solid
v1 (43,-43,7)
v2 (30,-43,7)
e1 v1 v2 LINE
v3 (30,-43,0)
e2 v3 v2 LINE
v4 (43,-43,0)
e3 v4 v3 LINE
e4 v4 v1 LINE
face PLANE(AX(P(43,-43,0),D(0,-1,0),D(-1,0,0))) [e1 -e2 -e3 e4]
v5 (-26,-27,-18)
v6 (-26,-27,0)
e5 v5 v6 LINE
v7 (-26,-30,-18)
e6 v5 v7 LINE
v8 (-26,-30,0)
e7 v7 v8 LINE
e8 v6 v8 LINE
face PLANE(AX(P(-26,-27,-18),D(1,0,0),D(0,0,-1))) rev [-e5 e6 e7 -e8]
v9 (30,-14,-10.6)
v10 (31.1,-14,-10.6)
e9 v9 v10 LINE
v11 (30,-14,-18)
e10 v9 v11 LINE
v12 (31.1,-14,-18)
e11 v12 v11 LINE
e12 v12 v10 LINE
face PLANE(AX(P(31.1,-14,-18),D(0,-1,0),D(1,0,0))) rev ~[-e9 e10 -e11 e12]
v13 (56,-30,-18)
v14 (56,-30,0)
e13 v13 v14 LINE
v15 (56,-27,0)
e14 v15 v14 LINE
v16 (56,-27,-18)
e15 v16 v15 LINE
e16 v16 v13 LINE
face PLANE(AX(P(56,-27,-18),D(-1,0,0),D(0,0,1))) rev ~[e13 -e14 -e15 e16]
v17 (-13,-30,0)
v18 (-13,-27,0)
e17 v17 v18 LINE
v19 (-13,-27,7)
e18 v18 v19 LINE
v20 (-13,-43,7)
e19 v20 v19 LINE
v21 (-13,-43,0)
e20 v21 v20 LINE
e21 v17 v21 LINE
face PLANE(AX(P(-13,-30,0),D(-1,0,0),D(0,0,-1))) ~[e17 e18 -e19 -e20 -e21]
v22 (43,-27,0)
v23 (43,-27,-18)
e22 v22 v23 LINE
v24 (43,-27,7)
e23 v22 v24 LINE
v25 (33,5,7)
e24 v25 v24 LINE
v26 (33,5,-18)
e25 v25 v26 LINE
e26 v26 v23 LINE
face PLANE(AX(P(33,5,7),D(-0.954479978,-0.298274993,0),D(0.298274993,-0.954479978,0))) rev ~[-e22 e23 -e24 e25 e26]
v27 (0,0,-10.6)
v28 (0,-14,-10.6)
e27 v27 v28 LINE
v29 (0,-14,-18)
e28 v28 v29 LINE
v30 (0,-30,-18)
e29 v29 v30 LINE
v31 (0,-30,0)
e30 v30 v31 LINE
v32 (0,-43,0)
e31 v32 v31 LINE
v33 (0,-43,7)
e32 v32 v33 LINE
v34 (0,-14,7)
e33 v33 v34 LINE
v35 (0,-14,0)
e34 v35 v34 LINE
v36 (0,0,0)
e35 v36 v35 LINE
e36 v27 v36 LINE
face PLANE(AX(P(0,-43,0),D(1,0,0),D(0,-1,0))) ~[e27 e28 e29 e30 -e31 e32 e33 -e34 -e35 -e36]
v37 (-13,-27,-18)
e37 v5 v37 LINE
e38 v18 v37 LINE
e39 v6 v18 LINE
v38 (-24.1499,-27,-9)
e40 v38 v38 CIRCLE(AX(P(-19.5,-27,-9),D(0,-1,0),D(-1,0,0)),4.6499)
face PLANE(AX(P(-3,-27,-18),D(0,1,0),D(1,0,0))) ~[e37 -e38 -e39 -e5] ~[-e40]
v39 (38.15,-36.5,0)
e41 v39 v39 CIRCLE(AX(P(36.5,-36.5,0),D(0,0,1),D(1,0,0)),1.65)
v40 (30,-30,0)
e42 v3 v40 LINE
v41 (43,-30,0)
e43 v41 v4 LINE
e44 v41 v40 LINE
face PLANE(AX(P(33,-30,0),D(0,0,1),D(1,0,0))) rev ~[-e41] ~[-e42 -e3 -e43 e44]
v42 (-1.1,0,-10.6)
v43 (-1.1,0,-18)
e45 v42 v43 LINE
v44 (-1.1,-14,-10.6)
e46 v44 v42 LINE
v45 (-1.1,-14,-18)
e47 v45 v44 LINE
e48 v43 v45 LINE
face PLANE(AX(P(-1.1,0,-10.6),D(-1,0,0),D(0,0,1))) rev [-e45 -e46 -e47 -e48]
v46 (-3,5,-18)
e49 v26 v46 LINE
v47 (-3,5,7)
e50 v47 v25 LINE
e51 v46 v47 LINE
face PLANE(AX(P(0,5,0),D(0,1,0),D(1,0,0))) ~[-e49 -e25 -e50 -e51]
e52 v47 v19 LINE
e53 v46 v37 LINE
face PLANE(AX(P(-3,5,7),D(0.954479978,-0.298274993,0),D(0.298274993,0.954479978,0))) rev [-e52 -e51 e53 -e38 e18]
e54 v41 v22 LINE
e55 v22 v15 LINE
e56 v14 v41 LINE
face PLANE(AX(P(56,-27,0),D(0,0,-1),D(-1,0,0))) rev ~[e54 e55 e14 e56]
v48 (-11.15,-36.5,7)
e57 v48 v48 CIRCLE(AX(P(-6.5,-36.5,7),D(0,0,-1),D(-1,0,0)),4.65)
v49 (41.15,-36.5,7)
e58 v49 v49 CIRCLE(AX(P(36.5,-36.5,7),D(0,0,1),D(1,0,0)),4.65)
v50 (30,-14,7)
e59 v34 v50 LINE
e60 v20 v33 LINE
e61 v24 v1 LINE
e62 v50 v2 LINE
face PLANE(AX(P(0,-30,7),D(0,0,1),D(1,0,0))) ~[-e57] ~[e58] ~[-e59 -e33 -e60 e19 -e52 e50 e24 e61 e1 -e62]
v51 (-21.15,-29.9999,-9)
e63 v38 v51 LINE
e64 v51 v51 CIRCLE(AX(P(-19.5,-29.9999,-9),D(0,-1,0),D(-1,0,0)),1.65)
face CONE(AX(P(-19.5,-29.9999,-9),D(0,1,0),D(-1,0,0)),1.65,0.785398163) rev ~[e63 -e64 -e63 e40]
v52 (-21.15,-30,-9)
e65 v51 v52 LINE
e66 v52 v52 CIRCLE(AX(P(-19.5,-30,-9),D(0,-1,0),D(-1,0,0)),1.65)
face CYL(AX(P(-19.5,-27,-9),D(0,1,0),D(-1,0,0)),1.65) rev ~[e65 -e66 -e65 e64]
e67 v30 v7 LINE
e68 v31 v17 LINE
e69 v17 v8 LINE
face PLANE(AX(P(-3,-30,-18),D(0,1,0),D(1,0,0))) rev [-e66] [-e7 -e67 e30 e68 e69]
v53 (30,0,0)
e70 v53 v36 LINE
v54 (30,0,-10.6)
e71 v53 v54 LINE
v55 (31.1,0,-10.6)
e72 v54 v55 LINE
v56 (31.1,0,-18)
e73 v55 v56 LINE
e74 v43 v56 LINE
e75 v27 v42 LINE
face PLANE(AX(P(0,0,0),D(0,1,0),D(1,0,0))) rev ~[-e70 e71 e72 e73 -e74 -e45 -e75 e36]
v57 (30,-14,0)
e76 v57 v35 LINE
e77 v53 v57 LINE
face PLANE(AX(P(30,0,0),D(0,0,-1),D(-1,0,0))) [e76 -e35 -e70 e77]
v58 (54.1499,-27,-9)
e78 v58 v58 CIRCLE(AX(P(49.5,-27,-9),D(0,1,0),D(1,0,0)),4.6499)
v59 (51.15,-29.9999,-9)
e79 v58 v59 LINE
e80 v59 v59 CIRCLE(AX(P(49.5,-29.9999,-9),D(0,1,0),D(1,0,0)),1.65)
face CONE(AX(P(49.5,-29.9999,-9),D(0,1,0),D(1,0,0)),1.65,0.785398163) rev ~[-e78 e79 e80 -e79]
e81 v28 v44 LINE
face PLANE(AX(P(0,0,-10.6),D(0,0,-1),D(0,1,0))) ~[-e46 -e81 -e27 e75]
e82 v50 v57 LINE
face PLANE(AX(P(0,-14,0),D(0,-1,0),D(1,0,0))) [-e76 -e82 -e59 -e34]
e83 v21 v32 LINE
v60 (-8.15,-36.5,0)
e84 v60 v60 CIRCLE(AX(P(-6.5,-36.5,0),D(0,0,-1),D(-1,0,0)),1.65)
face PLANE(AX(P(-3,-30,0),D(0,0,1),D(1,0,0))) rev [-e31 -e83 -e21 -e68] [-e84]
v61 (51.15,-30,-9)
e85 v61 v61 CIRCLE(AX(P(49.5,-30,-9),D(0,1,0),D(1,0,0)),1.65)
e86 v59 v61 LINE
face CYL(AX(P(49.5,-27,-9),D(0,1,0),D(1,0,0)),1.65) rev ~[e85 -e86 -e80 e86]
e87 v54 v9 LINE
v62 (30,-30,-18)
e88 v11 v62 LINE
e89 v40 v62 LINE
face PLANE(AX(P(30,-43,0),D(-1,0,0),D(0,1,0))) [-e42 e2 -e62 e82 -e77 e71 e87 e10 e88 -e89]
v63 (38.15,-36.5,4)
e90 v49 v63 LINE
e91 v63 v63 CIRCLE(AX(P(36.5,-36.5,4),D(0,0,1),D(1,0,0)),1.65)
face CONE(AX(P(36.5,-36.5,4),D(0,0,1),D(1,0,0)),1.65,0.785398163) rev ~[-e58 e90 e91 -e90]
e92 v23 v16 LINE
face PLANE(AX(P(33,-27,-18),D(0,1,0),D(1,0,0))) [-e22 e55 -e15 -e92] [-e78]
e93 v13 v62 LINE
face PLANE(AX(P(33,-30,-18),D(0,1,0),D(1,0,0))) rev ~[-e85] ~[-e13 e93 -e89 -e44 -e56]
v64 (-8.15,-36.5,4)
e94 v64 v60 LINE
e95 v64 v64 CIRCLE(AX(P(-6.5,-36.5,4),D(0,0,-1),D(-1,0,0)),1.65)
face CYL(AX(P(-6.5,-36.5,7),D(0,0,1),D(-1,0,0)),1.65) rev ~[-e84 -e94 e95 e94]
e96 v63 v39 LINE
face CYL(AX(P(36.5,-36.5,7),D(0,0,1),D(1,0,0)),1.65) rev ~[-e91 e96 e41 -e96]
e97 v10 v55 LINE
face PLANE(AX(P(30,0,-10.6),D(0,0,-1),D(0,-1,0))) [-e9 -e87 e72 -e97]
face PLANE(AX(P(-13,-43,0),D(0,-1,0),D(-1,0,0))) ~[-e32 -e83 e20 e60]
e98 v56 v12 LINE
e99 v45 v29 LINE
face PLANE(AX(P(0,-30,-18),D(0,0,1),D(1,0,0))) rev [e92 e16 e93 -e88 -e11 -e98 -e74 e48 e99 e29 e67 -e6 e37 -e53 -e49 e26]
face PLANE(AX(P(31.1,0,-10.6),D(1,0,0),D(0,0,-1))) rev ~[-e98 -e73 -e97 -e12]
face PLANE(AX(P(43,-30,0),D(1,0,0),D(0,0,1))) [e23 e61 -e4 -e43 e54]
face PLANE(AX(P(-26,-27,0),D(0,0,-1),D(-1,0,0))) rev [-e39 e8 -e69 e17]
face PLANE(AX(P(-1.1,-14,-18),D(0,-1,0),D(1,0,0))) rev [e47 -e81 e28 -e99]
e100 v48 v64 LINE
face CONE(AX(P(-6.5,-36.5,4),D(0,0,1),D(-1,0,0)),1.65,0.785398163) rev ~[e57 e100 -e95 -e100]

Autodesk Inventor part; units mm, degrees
ref_plane "YZ Plane" through (0, 0, 0) normal (1, 0, 0) x (0, 1, 0)
ref_plane "XZ Plane" through (0, 0, 0) normal (0, 1, 0) x (-1, 0, 0)
ref_plane "XY Plane" through (0, 0, 0) normal (0, 0, 1) x (1, 0, 0)
sketch "Sketch1" plane through (0, 0, 0) normal (0, 1, 0) x (-1, 0, 0)
  line L0 (0, 0) -> (-30, 0)
  line L1 (-30, 0) -> (-30, -10.6)
  line L2 (-30, -10.6) -> (0, -10.6)
  line L3 (0, -10.6) -> (0, 0)
  line L4 (0, -10.6) -> (1.1, -10.6)
  line L5 (1.1, -10.6) -> (1.1, -18)
  line L6 (1.1, -18) -> (0, -18)
  line L7 (0, -18) -> (0, -10.6)
  line L8 (-30, -10.6) -> (-31.1, -10.6)
  line L9 (-31.1, -10.6) -> (-31.1, -18)
  line L10 (-31.1, -18) -> (-30, -18)
  line L11 (-30, -18) -> (-30, -10.6)
  line L12 (0, -18) -> (-30, -18)
  dimension "d0" = 30
  dimension "d1" = 10.6
  dimension "d2" = 1.1
  dimension "d3" = 1.1
  dimension "d4" = 7.4
  dimension "d5" = 7.4
extrude "Extrusion1" add sketch "Sketch1" along normal blind 3
sketch "Sketch2" plane through (30, 0, 0) normal (1, 0, 0) x (0, 0, -1)
  point P0 (0, 0)
sketch "Sketch3" plane through (30, 0, 0) normal (1, 0, 0) x (0, 0, -1)
  line L0 (0, 0) -> (10.6, 0) projected
  line L1 (0, 0) -> (0, -30)
  line L2 (0, -30) -> (10.6, -30)
  line L3 (10.6, 0) -> (10.6, -30)
  line L4 (10.6, 0) -> (0, 0) projected
  line L5 (0, 0) -> (10.6, 0)
  dimension "d8" = 30
sketch "Sketch4" plane through (31.1, 0, -10.6) normal (1, 0, 0) x (0, 0, -1)
  line L0 (0, 0) -> (7.4, 0) projected
  line L1 (7.4, 0) -> (7.4, -14)
  line L2 (7.4, -14) -> (0, -14)
  line L3 (0, -14) -> (0, 0)
  line L4 (0, 0) -> (7.4, 0)
  point P0 (-10.6, 0)
  dimension "d9" = 14
extrude "Extrusion2" add sketch "Sketch3" along normal blind 3
extrude "Extrusion3" add sketch "Sketch4" along normal blind 3
sketch "Sketch5" plane through (31.1, -14, -18) normal (0, -1, 0) x (1, 0, 0)
  line L0 (1.9, 7.4) -> (1.9, 18) projected
  line L1 (1.9, 7.4) -> (1.9, 0)
  line L2 (0, 0) -> (3, 0) projected
  line L3 (-1.1, 18) -> (-1.1, 7.4) projected
  line L4 (-1.1, 7.4) -> (-1.1, 0)
  line L5 (0, 0) -> (-32.2, 0) projected
  line L6 (-1.1, 7.4) -> (1.9, 7.4) projected
  line L7 (1.9, 7.4) -> (-1.1, 7.4)
  point P0 (-31.1, 18)
extrude "Extrusion4" add sketch "Sketch5" along normal blind 16
sketch "Sketch6" plane through (30, 0, 0) normal (0, 1, 0) x (1, 0, 0)
  line L0 (1.1, 10.6) -> (1.1, 18) projected
  line L1 (1.1, 10.6) -> (1.1, 0)
  line L2 (0, 0) -> (3, 0) projected
  line L3 (1.1, 0) -> (0, 0)
  line L4 (0, 0) -> (0, 10.6)
  line L5 (0, 0) -> (0, 18) projected
  line L6 (0, 10.6) -> (1.1, 10.6) projected
  line L7 (1.1, 10.6) -> (0, 10.6)
  point P0 (-30, 0)
extrude "Extrusion5" add sketch "Sketch6" along normal blind 3
sketch "Sketch7" plane through (31.1, 3, 0) normal (1, 0, 0) x (0, 0, -1)
  point P0 (0, -3)
sketch "Sketch8" plane through (31.1, 0, 0) normal (0, 1, 0) x (1, 0, 0)
  line L0 (0, 0) -> (1.9, 0) projected
  line L1 (0, 0) -> (0, 18) projected
  line L2 (1.9, 0) -> (0, 0)
  line L3 (0, 0) -> (0, 18)
  line L4 (0, 18) -> (1.9, 18)
  line L5 (1.9, 18) -> (1.9, 0)
  point P0 (-31.1, 0)
extrude "Extrusion6" add sketch "Sketch8" along normal up to surface (3 mm away)
sketch "Sketch9" plane through (33, -14, -10.6) normal (0, 0, 1) x (1, 0, 0)
  line L0 (0, 0) -> (0, 14) projected
  line L1 (0, 0) -> (1.1, 0) projected
  line L2 (1.1, 14) -> (1.1, 0) projected
  line L3 (0, 14) -> (1.1, 14) projected
  line L4 (0, 0) -> (0, 14) projected
  line L5 (0, 14) -> (1.1, 14)
  line L6 (1.1, 14) -> (1.1, 0)
  line L7 (1.1, 0) -> (0, 0)
  line L8 (0, 0) -> (0, 14)
  point P0 (-33, 14)
extrude "Extrusion7" cut sketch "Sketch9" against normal blind 2000
sketch "Sketch10" plane through (33, 0, 0) normal (1, 0, 0) x (0, 0, -1)
  line L0 (0, -30) -> (0, 3) projected
  line L1 (0, -30) -> (18, -30)
  line L2 (18, -30) -> (18, -27)
  line L3 (18, -27) -> (0, -27)
  line L4 (0, -27) -> (0, -30)
  point P0 (0, 0)
  point P1 (0, 1.1)
  dimension "d25" = 18
  dimension "d26" = 3
extrude "Extrusion8" add sketch "Sketch10" along normal blind 14
sketch "Sketch12" plane through (0, 3, 0) normal (0, 1, 0) x (1, 0, 0)
  line L0 (0, 10.6) -> (0, 0) projected
  line L1 (15, 0) -> (15, 18)
  point P0 (30, 10.6)
  point P1 (31.1, 10.6)
  point P2 (30, 0)
ref_plane "Work Plane1" through (15, 0, -10.6) normal (-1, 0, 0) x (0, 0, 1)
mirror "Mirror1" about plane through (15, 0, -10.6) normal (-1, 0, 0) of "Extrusion2", "Extrusion3", "Extrusion4", "Extrusion5", "Extrusion6", "Extrusion7", "Extrusion8"
sketch "Sketch13" plane through (30, -30, 0) normal (0, 0, 1) x (1, 0, 0)
  line L0 (-33, 33) -> (3, 33) projected
  line L1 (-30, 30) -> (0, 30)
  line L2 (0, 30) -> (0, 33)
  line L3 (0, 33) -> (-30, 33)
  line L4 (-30, 33) -> (-30, 30)
  point P0 (-31.1, 33)
  point P1 (1.1, 33)
  dimension "d36" = 30
extrude "Extrusion10" add sketch "Sketch13" along normal blind 7
sketch "Sketch14" plane through (0, 0, 0) normal (0, -1, 0) x (1, 0, 0)
  line L0 (0, 0) -> (0, 7) projected
  line L1 (30, 0) -> (30, -10.6) projected
  line L2 (0, 7) -> (30, 7)
  line L3 (30, 7) -> (30, 0)
  line L4 (30, 0) -> (0, 0)
  line L5 (0, 0) -> (0, 7)
extrude "Extrusion11" add sketch "Sketch14" along normal blind 14
sketch "Sketch16" plane through (0, 3, 0) normal (0, 1, 0) x (1, 0, 0)
  line L0 (30, -7) -> (0, -7) projected
  line L1 (-3, 18) -> (33, 18) projected
  line L2 (30, -7) -> (0, -7)
  line L3 (0, -7) -> (0, 18)
  line L4 (0, 18) -> (30, 18)
  line L5 (30, 18) -> (30, -7)
  line L6 (33, 18) -> (31.1, 18) projected
  line L7 (31.1, 18) -> (30, 18)
  line L8 (30, 18) -> (30, 0)
  line L9 (30, 0) -> (31.1, 0)
  line L10 (0, 0) -> (0, 18) projected
  line L11 (0, 18) -> (-1.1, 18)
  line L12 (-1.1, 0) -> (0, 0)
  line L13 (0, 0) -> (0, 18)
  line L14 (31.1, 18) -> (33, 18)
  line L15 (33, 0) -> (31.1, 0)
  line L16 (33, 0) -> (30, 0) projected
  line L17 (31.1, 18) -> (-1.1, 18) projected
  line L18 (-3, 18) -> (-17, 18) projected
  line L19 (-1.1, 18) -> (-3, 18)
  line L20 (-3, 18) -> (-3, 0) projected
  line L21 (-3, 18) -> (-3, 0)
  line L22 (-3, 0) -> (-1.1, 0)
  line L23 (0, 0) -> (-3, 0) projected
  line L24 (33, 18) -> (33, 0) projected
  line L25 (33, 18) -> (33, 0)
extrude "Extrusion13" add sketch "Sketch16" along normal blind 2
sketch "Sketch17" plane through (30, -30, 0) normal (0, 0, 1) x (1, 0, 0)
  line L0 (0, 35) -> (3, 35) projected
  line L1 (3, 35) -> (0, 35)
  line L2 (0, 35) -> (0, 0)
  line L3 (0, 0) -> (3, 0)
  line L4 (3, 0) -> (3, 35)
  line L5 (0, 0) -> (17, 0) projected
  line L6 (0, 0) -> (13, 0)
  line L7 (13, 0) -> (13, -13.0001)
  line L8 (13, -13.0001) -> (0, -13.0001)
  line L9 (0, -13.0001) -> (0, 0)
  point P0 (-30, 30)
  dimension "d45" = 13
extrude "Extrusion14" add sketch "Sketch17" along normal blind 7 contours L0 L4 L3 L2
sketch "Sketch18" plane through (33, -30, 0) normal (0, 0, 1) x (1, 0, 0)
  line L0 (-3, 16) -> (-3, 0) projected
  line L1 (-3, 0) -> (10, 0)
  line L2 (10, 0) -> (10, -13)
  line L3 (10, -13) -> (-3, -13)
  line L4 (-3, -13) -> (-3, 0)
  point P0 (-33, 30)
  dimension "d48" = 13
  dimension "d49" = 13
extrude "Extrusion15" add sketch "Sketch18" along normal blind 7
sketch "Sketch19" plane through (33, -30, 0) normal (0, 1, 0) x (1, 0, 0)
  line L0 (10, 0) -> (10, -7) projected
  line L1 (10, -7) -> (0, -7) projected
  line L2 (10, 0) -> (0, 0)
  line L3 (0, 0) -> (0, -7)
  line L4 (0, -7) -> (10, -7)
  line L5 (10, -7) -> (10, 0)
  point P0 (-33, 0)
sketch "Sketch20" plane through (30, -30, 7) normal (0, 0, 1) x (1, 0, 0)
  line L0 (13, -13) -> (13, 0) projected
  line L1 (13, -6.5) -> (0, -6.5) construction
  line L2 (0, -13) -> (0, 0) projected
  line L3 (3, 0) -> (13, 0) projected
  line L4 (6.5, 0) -> (6.5, -6.5) construction
  circle A0 centre (6.5, -6.5) radius 1.65
  point P0 (-30, 30)
  dimension "d52" = 3.3
extrude "Extrusion16" cut sketch "Sketch20" against normal blind 7
chamfer "Chamfer3" distance 3 angle 45 1 edges at (34.85, -36.5, 7)
extrude "Extrusion17" add sketch "Sketch19" along normal blind 3
sketch "Sketch21" plane through (33, -27, -18) normal (0, 1, 0) x (1, 0, 0)
  line L0 (14, 0) -> (14, -18) projected
  line L1 (14, 0) -> (23, 0)
  line L2 (23, 0) -> (23, -18)
  line L3 (23, -18) -> (14, -18)
  line L4 (14, -18) -> (14, 0)
  point P0 (-33, -18)
  dimension "d60" = 9
extrude "Extrusion18" add sketch "Sketch21" against normal blind 3
sketch "Sketch22" plane through (33, -27, 7) normal (0, 1, 0) x (1, 0, 0)
  line L0 (10, 7) -> (23, 7) projected
  line L1 (16.5, 7) -> (16.5, 25) construction
  line L2 (0, 25) -> (23, 25) projected
  line L3 (23, 25) -> (23, 7) projected
  line L4 (23, 16) -> (16.5, 16) construction
  circle A0 centre (16.5, 16) radius 1.65
  point P0 (-33, 7)
  dimension "d63" = 3.3
extrude "Extrusion19" cut sketch "Sketch22" against normal blind 3
chamfer "Chamfer4" distance 3 angle 45 1 edges at (47.85, -27, -9)
sketch "Sketch24" plane through (30, -30, 7) normal (0, 0, 1) x (1, 0, 0)
  line L0 (1.1, 30) -> (1.1, 16) projected
  line L1 (-30, 35) -> (3, 35) projected
  line L2 (-30, 16) -> (-30, 35) projected
  line L3 (0, 16) -> (-30, 16) projected
  line L4 (0, 16) -> (0, -13) projected
  line L5 (0, -13) -> (13, -13) projected
  line L6 (13, -13) -> (13, 3) projected
  line L7 (3, 3) -> (13, 3) projected
  line L8 (3, 3) -> (3, 35) projected
  circle A0 centre (6.5, -6.5) radius 4.65 projected
  line L9 (3, 35) -> (3, 3) projected
  line L10 (3, 35) -> (3, 3)
  line L11 (3, 3) -> (13, 3)
  line L12 (3, 35) -> (13, 3)
  point P0 (-30, 30)
extrude "Extrusion20" add sketch "Sketch24" against normal blind 25 contours L12 L7 L8
ref_plane "Work Plane2" through (15, 0, 0) normal (1, 0, 0) x (0, 0, -1)
mirror "Mirror2" about plane through (15, 0, 0) normal (1, 0, 0) of "Extrusion1", "Extrusion2", "Extrusion3", "Extrusion4", "Extrusion5", "Extrusion6", "Extrusion7", "Extrusion8", "Extrusion10", "Extrusion11", "Extrusion13", "Extrusion14", "Extrusion15", "Extrusion16", "Chamfer3", "Extrusion17", "Extrusion18", "Extrusion19", "Chamfer4", "Extrusion20"
ref_plane "Work Plane3" through (15, 0, -10.6) normal (-1, 0, 0) x (0, 0, 1)
properties part number "buttonHolder"
